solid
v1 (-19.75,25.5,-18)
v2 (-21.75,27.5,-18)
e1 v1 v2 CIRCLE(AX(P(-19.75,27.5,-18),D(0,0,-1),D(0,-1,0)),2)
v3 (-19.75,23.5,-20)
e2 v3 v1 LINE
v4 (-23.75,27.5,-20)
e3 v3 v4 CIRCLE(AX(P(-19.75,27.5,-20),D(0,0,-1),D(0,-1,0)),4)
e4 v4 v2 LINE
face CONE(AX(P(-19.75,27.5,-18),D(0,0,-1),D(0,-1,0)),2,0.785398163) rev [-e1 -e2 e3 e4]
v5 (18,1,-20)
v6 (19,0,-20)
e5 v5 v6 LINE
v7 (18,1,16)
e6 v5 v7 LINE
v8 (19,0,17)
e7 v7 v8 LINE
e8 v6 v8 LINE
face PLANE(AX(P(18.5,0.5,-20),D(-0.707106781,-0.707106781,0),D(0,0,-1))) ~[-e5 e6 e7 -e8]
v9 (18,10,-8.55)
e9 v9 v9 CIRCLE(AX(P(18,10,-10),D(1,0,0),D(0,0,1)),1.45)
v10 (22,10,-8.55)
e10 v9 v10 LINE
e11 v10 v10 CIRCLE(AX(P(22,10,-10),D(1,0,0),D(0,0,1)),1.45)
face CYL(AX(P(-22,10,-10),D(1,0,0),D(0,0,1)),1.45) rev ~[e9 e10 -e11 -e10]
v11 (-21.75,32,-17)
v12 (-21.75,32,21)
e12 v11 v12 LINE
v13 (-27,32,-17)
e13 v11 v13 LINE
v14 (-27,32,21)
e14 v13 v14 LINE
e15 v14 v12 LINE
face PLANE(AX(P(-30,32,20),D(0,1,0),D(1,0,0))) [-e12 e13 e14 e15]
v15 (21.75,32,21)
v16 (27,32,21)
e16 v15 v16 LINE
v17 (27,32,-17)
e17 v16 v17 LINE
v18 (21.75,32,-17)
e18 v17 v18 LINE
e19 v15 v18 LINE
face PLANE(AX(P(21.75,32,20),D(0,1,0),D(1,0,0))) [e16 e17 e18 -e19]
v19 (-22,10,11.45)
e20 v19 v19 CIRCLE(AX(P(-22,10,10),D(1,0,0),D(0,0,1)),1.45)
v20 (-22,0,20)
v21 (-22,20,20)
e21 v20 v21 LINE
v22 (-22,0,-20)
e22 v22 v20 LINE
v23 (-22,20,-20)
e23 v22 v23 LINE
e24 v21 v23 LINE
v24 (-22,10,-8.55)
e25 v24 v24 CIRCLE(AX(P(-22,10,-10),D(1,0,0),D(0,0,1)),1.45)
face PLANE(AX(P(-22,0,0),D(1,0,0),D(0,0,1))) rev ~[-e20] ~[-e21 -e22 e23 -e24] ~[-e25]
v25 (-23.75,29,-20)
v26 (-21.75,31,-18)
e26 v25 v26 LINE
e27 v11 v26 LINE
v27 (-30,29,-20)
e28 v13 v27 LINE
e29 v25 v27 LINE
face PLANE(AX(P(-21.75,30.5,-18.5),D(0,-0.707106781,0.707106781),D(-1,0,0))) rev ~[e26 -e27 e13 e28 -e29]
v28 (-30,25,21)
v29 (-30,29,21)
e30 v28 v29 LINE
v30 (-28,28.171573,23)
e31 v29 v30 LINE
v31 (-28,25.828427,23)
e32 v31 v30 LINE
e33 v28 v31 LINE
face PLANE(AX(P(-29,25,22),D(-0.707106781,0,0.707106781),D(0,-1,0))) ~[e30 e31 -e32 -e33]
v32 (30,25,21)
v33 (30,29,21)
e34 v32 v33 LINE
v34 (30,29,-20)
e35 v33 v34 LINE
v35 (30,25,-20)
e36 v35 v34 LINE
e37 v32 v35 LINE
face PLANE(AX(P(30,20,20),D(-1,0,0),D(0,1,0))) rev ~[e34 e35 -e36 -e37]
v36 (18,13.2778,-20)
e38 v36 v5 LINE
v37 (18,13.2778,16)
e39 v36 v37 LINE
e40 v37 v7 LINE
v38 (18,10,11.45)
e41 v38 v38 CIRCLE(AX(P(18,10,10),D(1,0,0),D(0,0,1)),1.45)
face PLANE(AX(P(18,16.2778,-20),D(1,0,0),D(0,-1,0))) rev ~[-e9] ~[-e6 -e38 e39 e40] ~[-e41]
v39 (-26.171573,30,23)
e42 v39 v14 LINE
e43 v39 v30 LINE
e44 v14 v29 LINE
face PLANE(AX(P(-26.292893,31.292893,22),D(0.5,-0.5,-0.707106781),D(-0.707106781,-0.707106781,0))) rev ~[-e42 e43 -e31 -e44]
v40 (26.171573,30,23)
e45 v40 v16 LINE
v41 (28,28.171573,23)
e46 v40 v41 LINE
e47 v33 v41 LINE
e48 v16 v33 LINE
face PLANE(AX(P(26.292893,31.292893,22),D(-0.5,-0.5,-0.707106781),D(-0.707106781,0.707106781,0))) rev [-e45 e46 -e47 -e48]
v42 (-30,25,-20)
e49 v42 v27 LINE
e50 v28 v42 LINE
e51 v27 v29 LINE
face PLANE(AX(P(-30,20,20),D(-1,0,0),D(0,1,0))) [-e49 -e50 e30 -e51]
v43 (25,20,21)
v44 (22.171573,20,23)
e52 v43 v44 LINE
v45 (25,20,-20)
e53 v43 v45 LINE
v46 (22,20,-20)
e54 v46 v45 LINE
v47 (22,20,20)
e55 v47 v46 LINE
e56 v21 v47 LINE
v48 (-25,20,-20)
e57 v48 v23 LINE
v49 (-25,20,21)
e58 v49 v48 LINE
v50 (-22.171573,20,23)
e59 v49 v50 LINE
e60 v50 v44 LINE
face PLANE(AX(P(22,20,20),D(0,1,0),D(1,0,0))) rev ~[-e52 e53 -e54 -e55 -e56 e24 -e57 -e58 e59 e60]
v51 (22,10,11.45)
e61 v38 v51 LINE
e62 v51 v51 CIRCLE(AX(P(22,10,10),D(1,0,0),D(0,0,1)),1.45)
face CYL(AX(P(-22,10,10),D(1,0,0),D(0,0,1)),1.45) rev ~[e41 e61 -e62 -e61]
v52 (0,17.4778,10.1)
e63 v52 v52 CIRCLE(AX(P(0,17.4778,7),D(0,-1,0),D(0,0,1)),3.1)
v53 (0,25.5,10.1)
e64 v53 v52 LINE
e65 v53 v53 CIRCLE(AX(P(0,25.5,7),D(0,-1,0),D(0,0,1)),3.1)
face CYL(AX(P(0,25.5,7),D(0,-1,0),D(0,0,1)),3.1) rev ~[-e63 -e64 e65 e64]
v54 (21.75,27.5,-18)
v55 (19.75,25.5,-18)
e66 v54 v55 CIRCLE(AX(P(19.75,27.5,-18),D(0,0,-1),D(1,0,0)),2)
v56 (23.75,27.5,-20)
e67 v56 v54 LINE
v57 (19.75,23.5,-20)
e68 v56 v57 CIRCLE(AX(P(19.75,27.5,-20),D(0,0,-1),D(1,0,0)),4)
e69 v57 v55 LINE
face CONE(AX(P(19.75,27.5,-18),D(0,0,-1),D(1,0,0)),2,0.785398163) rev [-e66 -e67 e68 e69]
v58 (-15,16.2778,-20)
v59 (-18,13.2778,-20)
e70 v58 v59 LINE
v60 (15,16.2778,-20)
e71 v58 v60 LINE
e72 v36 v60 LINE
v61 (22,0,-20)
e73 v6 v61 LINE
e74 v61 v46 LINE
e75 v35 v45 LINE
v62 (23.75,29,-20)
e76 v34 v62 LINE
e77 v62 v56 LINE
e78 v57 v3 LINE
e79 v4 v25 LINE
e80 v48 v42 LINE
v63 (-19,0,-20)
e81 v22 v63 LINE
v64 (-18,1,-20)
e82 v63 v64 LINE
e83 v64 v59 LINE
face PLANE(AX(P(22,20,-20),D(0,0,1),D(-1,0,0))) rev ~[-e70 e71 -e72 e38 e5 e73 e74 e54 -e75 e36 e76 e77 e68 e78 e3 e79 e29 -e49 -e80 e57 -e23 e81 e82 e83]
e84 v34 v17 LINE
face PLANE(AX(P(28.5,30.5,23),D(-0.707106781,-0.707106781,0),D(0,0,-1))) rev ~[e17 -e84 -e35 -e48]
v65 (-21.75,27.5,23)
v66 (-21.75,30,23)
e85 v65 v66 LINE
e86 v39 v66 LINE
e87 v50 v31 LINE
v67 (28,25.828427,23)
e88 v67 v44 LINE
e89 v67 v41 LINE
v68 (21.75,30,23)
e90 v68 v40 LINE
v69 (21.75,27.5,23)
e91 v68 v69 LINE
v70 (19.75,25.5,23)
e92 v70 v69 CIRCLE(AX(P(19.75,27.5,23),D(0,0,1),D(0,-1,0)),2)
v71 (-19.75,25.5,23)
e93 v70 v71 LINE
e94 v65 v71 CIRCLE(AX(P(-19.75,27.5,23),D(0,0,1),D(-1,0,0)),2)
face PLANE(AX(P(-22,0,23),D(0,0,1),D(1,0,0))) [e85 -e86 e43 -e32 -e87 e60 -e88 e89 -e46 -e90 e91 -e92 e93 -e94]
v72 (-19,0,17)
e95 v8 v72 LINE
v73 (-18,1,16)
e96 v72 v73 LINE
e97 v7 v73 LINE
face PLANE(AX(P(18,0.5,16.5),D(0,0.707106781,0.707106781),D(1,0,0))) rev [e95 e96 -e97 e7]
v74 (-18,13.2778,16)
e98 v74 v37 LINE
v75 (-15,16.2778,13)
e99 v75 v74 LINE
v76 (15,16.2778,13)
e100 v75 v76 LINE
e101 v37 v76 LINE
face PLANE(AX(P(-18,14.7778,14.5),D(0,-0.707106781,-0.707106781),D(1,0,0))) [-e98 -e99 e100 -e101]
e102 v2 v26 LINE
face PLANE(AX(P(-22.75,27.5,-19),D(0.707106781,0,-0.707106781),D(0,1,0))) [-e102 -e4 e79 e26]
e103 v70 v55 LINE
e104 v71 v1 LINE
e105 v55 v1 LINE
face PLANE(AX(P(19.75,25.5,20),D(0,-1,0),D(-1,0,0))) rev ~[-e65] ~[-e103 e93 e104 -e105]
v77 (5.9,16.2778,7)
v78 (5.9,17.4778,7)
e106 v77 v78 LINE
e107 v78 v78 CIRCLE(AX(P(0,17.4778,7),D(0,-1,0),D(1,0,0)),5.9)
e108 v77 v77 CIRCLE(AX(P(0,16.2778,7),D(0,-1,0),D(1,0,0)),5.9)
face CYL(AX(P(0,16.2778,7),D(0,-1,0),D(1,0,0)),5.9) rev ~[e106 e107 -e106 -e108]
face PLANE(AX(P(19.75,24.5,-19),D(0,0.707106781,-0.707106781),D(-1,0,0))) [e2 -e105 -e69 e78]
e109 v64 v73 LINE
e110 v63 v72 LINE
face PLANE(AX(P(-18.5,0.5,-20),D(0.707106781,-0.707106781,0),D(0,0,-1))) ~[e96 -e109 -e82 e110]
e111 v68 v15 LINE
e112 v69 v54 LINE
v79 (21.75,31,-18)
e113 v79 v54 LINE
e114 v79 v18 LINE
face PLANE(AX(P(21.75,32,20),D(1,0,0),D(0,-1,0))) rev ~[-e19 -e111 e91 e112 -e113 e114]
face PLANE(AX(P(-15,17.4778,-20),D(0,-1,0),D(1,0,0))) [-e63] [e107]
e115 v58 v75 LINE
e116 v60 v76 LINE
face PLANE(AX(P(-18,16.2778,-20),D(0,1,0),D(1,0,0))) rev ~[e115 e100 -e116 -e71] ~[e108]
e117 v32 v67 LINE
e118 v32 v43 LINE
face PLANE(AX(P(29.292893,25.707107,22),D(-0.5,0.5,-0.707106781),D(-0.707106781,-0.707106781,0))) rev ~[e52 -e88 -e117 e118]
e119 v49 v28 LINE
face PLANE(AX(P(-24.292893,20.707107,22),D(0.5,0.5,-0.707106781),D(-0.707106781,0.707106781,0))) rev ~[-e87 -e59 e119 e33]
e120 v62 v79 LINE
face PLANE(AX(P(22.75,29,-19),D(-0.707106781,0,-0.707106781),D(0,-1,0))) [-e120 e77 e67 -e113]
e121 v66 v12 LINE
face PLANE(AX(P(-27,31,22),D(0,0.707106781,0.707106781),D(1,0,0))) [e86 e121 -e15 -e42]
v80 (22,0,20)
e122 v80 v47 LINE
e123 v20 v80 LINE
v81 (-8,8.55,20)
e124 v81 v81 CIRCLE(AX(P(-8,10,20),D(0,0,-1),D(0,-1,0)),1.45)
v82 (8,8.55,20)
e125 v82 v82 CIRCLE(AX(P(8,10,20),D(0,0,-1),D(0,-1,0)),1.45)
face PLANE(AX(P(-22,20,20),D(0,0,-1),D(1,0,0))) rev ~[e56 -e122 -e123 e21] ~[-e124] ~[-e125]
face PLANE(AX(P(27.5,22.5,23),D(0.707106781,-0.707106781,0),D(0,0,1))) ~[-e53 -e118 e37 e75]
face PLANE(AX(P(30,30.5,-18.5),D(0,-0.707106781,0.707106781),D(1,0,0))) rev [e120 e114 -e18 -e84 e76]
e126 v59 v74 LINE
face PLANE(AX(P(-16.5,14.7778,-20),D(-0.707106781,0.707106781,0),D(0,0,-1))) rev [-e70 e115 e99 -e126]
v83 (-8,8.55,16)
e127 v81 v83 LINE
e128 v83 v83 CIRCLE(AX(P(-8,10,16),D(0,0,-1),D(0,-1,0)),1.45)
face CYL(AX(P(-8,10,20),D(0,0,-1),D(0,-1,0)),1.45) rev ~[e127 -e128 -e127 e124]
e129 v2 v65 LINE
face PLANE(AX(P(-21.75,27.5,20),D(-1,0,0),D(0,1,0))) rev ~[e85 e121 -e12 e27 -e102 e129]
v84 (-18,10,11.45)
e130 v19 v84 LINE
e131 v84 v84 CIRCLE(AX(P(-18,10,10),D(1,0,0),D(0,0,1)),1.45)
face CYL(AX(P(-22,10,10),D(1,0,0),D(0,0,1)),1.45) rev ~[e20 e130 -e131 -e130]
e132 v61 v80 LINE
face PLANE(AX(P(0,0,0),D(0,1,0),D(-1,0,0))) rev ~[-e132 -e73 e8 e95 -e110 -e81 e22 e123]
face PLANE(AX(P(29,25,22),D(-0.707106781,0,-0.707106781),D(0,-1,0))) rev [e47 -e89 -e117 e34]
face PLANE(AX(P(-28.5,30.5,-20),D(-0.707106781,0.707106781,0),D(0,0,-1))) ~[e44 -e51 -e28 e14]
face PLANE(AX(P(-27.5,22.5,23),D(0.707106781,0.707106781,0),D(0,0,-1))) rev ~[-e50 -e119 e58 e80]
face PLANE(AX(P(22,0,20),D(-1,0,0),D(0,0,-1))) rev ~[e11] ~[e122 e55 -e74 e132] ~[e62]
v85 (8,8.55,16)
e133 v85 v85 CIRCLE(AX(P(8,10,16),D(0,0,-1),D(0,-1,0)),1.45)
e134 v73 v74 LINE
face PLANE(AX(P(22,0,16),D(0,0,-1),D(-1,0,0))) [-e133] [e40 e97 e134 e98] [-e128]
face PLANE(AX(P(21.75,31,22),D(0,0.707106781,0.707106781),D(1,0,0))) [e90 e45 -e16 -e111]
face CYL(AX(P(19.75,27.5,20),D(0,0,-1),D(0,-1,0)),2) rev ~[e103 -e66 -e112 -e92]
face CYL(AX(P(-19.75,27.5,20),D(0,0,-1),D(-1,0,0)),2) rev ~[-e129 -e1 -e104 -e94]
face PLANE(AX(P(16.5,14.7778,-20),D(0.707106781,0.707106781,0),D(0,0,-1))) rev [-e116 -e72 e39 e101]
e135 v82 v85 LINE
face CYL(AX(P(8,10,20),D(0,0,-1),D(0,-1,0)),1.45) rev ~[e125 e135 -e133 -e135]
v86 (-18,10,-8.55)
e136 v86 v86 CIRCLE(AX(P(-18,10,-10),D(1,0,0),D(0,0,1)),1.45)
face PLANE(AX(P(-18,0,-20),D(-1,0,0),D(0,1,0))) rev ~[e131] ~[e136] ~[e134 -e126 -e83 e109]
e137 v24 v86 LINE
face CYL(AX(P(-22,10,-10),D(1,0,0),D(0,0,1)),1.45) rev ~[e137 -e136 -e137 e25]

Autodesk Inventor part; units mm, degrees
ref_plane "YZ Plane" through (0, 0, 0) normal (1, 0, 0) x (0, 1, 0)
ref_plane "XZ Plane" through (0, 0, 0) normal (0, 1, 0) x (-1, 0, 0)
ref_plane "XY Plane" through (0, 0, 0) normal (0, 0, 1) x (1, 0, 0)
sketch "Sketch1" plane through (0, 0, 0) normal (0, 1, 0) x (-1, 0, 0)
  line L0 (22, 20) -> (-22, 20)
  line L1 (-22, 20) -> (-22, -20)
  line L2 (-22, -20) -> (22, -20)
  line L3 (22, -20) -> (22, 20)
  line L4 (0, -20) -> (0, 20)
  line L5 (22, 0) -> (-22, 0)
  point P0 (0, 0)
  dimension "d0" = 44
  dimension "d1" = 40
extrude "Extrusion1" add sketch "Sketch1" along normal blind 20
sketch "Sketch2" plane through (0, 20, 0) normal (0, 1, 0) x (1, 0, 0)
  line L0 (22, 20) -> (-22, 20) projected
  line L1 (-22, 20) -> (-22, -20) projected
  line L2 (-22, -20) -> (22, -20) projected
  line L3 (22, -20) -> (22, 20) projected
  line L4 (-30, -41.7016) -> (-30, 48.9081)
  line L5 (30, 51.5024) -> (30, -37.5698)
  line L6 (-22, -20) -> (22, -20) projected
  line L7 (-22, -20) -> (-30, -20)
  line L8 (-22, 20) -> (-22, -20) projected
  line L9 (-22, 20) -> (-30, 20)
  line L10 (22, -20) -> (22, 20) projected
  line L11 (22, 20) -> (30, 20)
  line L12 (22, -20) -> (30, -20)
  point P0 (0, 0)
  dimension "d4" = 30
  dimension "d5" = 30
extrude "Extrusion2" add sketch "Sketch2" along normal blind 12
sketch "Sketch3" plane through (0, 32, 0) normal (0, 1, 0) x (1, 0, 0)
  line L0 (22, 20) -> (-22, 20) projected
  line L1 (-22, -20) -> (22, -20) projected
  line L2 (-21.75, 20) -> (21.75, 20)
  line L3 (21.75, 20) -> (21.75, -20)
  line L4 (21.75, -20) -> (-21.75, -20)
  line L5 (-21.75, -20) -> (-21.75, 20)
  line L6 (-21.75, 0) -> (21.75, 0)
  point P0 (0, 0)
  dimension "d8" = 21.75
  dimension "d9" = 21.75
extrude "Extrusion3" cut sketch "Sketch3" against normal blind 6.5
fillet "Fillet1" radius 2 2 edges at (-21.75, 25.5, 0) (21.75, 25.5, 0)
sketch "Sketch4" plane through (-22, 0, 20) normal (0, 0, 1) x (1, 0, 0)
  line L0 (0.25, 27.5) -> (0.25, 32) projected
  line L1 (-8, 32) -> (0.25, 32) projected
  line L2 (-8, 20) -> (-8, 32) projected
  line L3 (-8, 20) -> (0, 20) projected
  line L4 (0, 0) -> (0, 20) projected
  line L5 (0, 0) -> (44, 0) projected
  line L6 (44, 0) -> (44, 20) projected
  line L7 (44, 20) -> (52, 20) projected
  line L8 (52, 20) -> (52, 32) projected
  line L9 (43.75, 32) -> (52, 32) projected
  line L10 (43.75, 32) -> (43.75, 27.5) projected
  arc A0 (41.75, 25.5) -> (43.75, 27.5) centre (41.75, 27.5) ccw projected
  line L11 (41.75, 25.5) -> (2.25, 25.5) projected
  arc A1 (0.25, 27.5) -> (2.25, 25.5) centre (2.25, 27.5) ccw projected
  line L12 (-8, 20) -> (0, 20) projected
  line L13 (0, 20) -> (44, 20)
  point P0 (22, 0)
extrude "Extrusion4" add sketch "Sketch4" along normal blind 3 contours A1 L11 A0 L10 L9 L8 L7 L13 L3 L2 L1 L0
chamfer "Chamfer1" distance 3 angle 45 4 edges at (25.875, 32, -20) (-25.875, 32, -20) (30, 32, 1.5) (-30, 32, 1.5)
sketch "Sketch5" plane through (22, 0, -20) normal (0, 0, -1) x (-1, 0, 0)
  line L0 (0, 0) -> (44, 0) projected
  line L1 (4, 0) -> (40, 0)
  line L2 (40, 0) -> (40, 16.2778)
  line L3 (40, 16.2778) -> (4, 16.2778)
  line L4 (4, 16.2778) -> (4, 0)
  line L5 (0, 0) -> (0, 20) projected
  line L6 (44, 0) -> (44, 20) projected
  point P0 (22, 0)
  dimension "d18" = 4
  dimension "d19" = 4
extrude "Extrusion5" cut sketch "Sketch5" against normal blind 36
chamfer "Chamfer2" distance 3 angle 45 3 edges at (18, 16.2778, -2) (-18, 16.2778, -2) (0, 16.2778, 16)
sketch "Sketch6" plane through (-22, 0, -20) normal (-1, 0, 0) x (0, 0, 1)
  line L0 (10, 10) -> (30, 10) construction
  line L1 (0, 0) -> (0, 20) projected
  line L2 (0, 20) -> (43, 20) projected
  point P0 (20, 0)
  dimension "d25" = 10
  dimension "d26" = 10
  dimension "d53" = 20
hole "Hole1" at (-22, 10, -10) at (-22, 10, 10) direction (1, 0, 0) diameter 2.9 end through all
sketch "Sketch7" plane through (-22, 0, 20) normal (0, 0, 1) x (1, 0, 0)
  line L0 (14, 10) -> (30, 10) construction
  line L1 (-8, 20) -> (52, 20) projected
  line L2 (0, 0) -> (0, 20) projected
  point P0 (22, 0)
  dimension "d34" = 10
  dimension "d35" = 16
  dimension "d36" = 14
hole "Hole2" at (-8, 10, 20) at (8, 10, 20) direction (0, 0, -1) diameter 2.9 end through all
chamfer "Chamfer3" distance 1 angle 45 3 edges at (18, 0, -2) (0, 0, 16) (-18, 0, -2)
chamfer "Chamfer4" distance 2 angle 45 5 edges at (0, 25.5, -20) (21.1642, 26.0858, -20) (21.75, 28.25, -20) (-21.1642, 26.0858, -20) (-21.75, 28.25, -20)
chamfer "Chamfer5" distance 5 angle 45 2 edges at (30, 20, 1.5) (-30, 20, 1.5)
chamfer "Chamfer6" distance 2 angle 45 8 edges at (-27.5, 22.5, 23) (-30, 27, 23) (-28.5, 30.5, 23) (-24.375, 32, 23) (27.5, 22.5, 23) (30, 27, 23) (28.5, 30.5, 23) (24.375, 32, 23)
sketch "Sketch8" plane through (0, 25.5, 0) normal (0, 1, 0) x (1, 0, 0)
  line L0 (19.75, 20) -> (-19.75, 20) projected
  point P0 (0, 0)
  point P1 (0, -7)
  dimension "d57" = 27
hole "Hole3" at (0, 25.5, 7) direction (0, -1, 0) diameter 6.2 end through all
sketch "Sketch9" plane through (-15, 16.2778, -20) normal (0, -1, 0) x (1, 0, 0)
  circle A0 centre (15, 27) radius 3.1 projected
  circle A1 centre (15, 27) radius 5.9
  point P0 (15, 20)
  dimension "d65" = 2.8
extrude "Extrusion6" cut sketch "Sketch9" against normal blind 1.2
equation "\"d9\" = d8"
properties part number "Camera mount"
